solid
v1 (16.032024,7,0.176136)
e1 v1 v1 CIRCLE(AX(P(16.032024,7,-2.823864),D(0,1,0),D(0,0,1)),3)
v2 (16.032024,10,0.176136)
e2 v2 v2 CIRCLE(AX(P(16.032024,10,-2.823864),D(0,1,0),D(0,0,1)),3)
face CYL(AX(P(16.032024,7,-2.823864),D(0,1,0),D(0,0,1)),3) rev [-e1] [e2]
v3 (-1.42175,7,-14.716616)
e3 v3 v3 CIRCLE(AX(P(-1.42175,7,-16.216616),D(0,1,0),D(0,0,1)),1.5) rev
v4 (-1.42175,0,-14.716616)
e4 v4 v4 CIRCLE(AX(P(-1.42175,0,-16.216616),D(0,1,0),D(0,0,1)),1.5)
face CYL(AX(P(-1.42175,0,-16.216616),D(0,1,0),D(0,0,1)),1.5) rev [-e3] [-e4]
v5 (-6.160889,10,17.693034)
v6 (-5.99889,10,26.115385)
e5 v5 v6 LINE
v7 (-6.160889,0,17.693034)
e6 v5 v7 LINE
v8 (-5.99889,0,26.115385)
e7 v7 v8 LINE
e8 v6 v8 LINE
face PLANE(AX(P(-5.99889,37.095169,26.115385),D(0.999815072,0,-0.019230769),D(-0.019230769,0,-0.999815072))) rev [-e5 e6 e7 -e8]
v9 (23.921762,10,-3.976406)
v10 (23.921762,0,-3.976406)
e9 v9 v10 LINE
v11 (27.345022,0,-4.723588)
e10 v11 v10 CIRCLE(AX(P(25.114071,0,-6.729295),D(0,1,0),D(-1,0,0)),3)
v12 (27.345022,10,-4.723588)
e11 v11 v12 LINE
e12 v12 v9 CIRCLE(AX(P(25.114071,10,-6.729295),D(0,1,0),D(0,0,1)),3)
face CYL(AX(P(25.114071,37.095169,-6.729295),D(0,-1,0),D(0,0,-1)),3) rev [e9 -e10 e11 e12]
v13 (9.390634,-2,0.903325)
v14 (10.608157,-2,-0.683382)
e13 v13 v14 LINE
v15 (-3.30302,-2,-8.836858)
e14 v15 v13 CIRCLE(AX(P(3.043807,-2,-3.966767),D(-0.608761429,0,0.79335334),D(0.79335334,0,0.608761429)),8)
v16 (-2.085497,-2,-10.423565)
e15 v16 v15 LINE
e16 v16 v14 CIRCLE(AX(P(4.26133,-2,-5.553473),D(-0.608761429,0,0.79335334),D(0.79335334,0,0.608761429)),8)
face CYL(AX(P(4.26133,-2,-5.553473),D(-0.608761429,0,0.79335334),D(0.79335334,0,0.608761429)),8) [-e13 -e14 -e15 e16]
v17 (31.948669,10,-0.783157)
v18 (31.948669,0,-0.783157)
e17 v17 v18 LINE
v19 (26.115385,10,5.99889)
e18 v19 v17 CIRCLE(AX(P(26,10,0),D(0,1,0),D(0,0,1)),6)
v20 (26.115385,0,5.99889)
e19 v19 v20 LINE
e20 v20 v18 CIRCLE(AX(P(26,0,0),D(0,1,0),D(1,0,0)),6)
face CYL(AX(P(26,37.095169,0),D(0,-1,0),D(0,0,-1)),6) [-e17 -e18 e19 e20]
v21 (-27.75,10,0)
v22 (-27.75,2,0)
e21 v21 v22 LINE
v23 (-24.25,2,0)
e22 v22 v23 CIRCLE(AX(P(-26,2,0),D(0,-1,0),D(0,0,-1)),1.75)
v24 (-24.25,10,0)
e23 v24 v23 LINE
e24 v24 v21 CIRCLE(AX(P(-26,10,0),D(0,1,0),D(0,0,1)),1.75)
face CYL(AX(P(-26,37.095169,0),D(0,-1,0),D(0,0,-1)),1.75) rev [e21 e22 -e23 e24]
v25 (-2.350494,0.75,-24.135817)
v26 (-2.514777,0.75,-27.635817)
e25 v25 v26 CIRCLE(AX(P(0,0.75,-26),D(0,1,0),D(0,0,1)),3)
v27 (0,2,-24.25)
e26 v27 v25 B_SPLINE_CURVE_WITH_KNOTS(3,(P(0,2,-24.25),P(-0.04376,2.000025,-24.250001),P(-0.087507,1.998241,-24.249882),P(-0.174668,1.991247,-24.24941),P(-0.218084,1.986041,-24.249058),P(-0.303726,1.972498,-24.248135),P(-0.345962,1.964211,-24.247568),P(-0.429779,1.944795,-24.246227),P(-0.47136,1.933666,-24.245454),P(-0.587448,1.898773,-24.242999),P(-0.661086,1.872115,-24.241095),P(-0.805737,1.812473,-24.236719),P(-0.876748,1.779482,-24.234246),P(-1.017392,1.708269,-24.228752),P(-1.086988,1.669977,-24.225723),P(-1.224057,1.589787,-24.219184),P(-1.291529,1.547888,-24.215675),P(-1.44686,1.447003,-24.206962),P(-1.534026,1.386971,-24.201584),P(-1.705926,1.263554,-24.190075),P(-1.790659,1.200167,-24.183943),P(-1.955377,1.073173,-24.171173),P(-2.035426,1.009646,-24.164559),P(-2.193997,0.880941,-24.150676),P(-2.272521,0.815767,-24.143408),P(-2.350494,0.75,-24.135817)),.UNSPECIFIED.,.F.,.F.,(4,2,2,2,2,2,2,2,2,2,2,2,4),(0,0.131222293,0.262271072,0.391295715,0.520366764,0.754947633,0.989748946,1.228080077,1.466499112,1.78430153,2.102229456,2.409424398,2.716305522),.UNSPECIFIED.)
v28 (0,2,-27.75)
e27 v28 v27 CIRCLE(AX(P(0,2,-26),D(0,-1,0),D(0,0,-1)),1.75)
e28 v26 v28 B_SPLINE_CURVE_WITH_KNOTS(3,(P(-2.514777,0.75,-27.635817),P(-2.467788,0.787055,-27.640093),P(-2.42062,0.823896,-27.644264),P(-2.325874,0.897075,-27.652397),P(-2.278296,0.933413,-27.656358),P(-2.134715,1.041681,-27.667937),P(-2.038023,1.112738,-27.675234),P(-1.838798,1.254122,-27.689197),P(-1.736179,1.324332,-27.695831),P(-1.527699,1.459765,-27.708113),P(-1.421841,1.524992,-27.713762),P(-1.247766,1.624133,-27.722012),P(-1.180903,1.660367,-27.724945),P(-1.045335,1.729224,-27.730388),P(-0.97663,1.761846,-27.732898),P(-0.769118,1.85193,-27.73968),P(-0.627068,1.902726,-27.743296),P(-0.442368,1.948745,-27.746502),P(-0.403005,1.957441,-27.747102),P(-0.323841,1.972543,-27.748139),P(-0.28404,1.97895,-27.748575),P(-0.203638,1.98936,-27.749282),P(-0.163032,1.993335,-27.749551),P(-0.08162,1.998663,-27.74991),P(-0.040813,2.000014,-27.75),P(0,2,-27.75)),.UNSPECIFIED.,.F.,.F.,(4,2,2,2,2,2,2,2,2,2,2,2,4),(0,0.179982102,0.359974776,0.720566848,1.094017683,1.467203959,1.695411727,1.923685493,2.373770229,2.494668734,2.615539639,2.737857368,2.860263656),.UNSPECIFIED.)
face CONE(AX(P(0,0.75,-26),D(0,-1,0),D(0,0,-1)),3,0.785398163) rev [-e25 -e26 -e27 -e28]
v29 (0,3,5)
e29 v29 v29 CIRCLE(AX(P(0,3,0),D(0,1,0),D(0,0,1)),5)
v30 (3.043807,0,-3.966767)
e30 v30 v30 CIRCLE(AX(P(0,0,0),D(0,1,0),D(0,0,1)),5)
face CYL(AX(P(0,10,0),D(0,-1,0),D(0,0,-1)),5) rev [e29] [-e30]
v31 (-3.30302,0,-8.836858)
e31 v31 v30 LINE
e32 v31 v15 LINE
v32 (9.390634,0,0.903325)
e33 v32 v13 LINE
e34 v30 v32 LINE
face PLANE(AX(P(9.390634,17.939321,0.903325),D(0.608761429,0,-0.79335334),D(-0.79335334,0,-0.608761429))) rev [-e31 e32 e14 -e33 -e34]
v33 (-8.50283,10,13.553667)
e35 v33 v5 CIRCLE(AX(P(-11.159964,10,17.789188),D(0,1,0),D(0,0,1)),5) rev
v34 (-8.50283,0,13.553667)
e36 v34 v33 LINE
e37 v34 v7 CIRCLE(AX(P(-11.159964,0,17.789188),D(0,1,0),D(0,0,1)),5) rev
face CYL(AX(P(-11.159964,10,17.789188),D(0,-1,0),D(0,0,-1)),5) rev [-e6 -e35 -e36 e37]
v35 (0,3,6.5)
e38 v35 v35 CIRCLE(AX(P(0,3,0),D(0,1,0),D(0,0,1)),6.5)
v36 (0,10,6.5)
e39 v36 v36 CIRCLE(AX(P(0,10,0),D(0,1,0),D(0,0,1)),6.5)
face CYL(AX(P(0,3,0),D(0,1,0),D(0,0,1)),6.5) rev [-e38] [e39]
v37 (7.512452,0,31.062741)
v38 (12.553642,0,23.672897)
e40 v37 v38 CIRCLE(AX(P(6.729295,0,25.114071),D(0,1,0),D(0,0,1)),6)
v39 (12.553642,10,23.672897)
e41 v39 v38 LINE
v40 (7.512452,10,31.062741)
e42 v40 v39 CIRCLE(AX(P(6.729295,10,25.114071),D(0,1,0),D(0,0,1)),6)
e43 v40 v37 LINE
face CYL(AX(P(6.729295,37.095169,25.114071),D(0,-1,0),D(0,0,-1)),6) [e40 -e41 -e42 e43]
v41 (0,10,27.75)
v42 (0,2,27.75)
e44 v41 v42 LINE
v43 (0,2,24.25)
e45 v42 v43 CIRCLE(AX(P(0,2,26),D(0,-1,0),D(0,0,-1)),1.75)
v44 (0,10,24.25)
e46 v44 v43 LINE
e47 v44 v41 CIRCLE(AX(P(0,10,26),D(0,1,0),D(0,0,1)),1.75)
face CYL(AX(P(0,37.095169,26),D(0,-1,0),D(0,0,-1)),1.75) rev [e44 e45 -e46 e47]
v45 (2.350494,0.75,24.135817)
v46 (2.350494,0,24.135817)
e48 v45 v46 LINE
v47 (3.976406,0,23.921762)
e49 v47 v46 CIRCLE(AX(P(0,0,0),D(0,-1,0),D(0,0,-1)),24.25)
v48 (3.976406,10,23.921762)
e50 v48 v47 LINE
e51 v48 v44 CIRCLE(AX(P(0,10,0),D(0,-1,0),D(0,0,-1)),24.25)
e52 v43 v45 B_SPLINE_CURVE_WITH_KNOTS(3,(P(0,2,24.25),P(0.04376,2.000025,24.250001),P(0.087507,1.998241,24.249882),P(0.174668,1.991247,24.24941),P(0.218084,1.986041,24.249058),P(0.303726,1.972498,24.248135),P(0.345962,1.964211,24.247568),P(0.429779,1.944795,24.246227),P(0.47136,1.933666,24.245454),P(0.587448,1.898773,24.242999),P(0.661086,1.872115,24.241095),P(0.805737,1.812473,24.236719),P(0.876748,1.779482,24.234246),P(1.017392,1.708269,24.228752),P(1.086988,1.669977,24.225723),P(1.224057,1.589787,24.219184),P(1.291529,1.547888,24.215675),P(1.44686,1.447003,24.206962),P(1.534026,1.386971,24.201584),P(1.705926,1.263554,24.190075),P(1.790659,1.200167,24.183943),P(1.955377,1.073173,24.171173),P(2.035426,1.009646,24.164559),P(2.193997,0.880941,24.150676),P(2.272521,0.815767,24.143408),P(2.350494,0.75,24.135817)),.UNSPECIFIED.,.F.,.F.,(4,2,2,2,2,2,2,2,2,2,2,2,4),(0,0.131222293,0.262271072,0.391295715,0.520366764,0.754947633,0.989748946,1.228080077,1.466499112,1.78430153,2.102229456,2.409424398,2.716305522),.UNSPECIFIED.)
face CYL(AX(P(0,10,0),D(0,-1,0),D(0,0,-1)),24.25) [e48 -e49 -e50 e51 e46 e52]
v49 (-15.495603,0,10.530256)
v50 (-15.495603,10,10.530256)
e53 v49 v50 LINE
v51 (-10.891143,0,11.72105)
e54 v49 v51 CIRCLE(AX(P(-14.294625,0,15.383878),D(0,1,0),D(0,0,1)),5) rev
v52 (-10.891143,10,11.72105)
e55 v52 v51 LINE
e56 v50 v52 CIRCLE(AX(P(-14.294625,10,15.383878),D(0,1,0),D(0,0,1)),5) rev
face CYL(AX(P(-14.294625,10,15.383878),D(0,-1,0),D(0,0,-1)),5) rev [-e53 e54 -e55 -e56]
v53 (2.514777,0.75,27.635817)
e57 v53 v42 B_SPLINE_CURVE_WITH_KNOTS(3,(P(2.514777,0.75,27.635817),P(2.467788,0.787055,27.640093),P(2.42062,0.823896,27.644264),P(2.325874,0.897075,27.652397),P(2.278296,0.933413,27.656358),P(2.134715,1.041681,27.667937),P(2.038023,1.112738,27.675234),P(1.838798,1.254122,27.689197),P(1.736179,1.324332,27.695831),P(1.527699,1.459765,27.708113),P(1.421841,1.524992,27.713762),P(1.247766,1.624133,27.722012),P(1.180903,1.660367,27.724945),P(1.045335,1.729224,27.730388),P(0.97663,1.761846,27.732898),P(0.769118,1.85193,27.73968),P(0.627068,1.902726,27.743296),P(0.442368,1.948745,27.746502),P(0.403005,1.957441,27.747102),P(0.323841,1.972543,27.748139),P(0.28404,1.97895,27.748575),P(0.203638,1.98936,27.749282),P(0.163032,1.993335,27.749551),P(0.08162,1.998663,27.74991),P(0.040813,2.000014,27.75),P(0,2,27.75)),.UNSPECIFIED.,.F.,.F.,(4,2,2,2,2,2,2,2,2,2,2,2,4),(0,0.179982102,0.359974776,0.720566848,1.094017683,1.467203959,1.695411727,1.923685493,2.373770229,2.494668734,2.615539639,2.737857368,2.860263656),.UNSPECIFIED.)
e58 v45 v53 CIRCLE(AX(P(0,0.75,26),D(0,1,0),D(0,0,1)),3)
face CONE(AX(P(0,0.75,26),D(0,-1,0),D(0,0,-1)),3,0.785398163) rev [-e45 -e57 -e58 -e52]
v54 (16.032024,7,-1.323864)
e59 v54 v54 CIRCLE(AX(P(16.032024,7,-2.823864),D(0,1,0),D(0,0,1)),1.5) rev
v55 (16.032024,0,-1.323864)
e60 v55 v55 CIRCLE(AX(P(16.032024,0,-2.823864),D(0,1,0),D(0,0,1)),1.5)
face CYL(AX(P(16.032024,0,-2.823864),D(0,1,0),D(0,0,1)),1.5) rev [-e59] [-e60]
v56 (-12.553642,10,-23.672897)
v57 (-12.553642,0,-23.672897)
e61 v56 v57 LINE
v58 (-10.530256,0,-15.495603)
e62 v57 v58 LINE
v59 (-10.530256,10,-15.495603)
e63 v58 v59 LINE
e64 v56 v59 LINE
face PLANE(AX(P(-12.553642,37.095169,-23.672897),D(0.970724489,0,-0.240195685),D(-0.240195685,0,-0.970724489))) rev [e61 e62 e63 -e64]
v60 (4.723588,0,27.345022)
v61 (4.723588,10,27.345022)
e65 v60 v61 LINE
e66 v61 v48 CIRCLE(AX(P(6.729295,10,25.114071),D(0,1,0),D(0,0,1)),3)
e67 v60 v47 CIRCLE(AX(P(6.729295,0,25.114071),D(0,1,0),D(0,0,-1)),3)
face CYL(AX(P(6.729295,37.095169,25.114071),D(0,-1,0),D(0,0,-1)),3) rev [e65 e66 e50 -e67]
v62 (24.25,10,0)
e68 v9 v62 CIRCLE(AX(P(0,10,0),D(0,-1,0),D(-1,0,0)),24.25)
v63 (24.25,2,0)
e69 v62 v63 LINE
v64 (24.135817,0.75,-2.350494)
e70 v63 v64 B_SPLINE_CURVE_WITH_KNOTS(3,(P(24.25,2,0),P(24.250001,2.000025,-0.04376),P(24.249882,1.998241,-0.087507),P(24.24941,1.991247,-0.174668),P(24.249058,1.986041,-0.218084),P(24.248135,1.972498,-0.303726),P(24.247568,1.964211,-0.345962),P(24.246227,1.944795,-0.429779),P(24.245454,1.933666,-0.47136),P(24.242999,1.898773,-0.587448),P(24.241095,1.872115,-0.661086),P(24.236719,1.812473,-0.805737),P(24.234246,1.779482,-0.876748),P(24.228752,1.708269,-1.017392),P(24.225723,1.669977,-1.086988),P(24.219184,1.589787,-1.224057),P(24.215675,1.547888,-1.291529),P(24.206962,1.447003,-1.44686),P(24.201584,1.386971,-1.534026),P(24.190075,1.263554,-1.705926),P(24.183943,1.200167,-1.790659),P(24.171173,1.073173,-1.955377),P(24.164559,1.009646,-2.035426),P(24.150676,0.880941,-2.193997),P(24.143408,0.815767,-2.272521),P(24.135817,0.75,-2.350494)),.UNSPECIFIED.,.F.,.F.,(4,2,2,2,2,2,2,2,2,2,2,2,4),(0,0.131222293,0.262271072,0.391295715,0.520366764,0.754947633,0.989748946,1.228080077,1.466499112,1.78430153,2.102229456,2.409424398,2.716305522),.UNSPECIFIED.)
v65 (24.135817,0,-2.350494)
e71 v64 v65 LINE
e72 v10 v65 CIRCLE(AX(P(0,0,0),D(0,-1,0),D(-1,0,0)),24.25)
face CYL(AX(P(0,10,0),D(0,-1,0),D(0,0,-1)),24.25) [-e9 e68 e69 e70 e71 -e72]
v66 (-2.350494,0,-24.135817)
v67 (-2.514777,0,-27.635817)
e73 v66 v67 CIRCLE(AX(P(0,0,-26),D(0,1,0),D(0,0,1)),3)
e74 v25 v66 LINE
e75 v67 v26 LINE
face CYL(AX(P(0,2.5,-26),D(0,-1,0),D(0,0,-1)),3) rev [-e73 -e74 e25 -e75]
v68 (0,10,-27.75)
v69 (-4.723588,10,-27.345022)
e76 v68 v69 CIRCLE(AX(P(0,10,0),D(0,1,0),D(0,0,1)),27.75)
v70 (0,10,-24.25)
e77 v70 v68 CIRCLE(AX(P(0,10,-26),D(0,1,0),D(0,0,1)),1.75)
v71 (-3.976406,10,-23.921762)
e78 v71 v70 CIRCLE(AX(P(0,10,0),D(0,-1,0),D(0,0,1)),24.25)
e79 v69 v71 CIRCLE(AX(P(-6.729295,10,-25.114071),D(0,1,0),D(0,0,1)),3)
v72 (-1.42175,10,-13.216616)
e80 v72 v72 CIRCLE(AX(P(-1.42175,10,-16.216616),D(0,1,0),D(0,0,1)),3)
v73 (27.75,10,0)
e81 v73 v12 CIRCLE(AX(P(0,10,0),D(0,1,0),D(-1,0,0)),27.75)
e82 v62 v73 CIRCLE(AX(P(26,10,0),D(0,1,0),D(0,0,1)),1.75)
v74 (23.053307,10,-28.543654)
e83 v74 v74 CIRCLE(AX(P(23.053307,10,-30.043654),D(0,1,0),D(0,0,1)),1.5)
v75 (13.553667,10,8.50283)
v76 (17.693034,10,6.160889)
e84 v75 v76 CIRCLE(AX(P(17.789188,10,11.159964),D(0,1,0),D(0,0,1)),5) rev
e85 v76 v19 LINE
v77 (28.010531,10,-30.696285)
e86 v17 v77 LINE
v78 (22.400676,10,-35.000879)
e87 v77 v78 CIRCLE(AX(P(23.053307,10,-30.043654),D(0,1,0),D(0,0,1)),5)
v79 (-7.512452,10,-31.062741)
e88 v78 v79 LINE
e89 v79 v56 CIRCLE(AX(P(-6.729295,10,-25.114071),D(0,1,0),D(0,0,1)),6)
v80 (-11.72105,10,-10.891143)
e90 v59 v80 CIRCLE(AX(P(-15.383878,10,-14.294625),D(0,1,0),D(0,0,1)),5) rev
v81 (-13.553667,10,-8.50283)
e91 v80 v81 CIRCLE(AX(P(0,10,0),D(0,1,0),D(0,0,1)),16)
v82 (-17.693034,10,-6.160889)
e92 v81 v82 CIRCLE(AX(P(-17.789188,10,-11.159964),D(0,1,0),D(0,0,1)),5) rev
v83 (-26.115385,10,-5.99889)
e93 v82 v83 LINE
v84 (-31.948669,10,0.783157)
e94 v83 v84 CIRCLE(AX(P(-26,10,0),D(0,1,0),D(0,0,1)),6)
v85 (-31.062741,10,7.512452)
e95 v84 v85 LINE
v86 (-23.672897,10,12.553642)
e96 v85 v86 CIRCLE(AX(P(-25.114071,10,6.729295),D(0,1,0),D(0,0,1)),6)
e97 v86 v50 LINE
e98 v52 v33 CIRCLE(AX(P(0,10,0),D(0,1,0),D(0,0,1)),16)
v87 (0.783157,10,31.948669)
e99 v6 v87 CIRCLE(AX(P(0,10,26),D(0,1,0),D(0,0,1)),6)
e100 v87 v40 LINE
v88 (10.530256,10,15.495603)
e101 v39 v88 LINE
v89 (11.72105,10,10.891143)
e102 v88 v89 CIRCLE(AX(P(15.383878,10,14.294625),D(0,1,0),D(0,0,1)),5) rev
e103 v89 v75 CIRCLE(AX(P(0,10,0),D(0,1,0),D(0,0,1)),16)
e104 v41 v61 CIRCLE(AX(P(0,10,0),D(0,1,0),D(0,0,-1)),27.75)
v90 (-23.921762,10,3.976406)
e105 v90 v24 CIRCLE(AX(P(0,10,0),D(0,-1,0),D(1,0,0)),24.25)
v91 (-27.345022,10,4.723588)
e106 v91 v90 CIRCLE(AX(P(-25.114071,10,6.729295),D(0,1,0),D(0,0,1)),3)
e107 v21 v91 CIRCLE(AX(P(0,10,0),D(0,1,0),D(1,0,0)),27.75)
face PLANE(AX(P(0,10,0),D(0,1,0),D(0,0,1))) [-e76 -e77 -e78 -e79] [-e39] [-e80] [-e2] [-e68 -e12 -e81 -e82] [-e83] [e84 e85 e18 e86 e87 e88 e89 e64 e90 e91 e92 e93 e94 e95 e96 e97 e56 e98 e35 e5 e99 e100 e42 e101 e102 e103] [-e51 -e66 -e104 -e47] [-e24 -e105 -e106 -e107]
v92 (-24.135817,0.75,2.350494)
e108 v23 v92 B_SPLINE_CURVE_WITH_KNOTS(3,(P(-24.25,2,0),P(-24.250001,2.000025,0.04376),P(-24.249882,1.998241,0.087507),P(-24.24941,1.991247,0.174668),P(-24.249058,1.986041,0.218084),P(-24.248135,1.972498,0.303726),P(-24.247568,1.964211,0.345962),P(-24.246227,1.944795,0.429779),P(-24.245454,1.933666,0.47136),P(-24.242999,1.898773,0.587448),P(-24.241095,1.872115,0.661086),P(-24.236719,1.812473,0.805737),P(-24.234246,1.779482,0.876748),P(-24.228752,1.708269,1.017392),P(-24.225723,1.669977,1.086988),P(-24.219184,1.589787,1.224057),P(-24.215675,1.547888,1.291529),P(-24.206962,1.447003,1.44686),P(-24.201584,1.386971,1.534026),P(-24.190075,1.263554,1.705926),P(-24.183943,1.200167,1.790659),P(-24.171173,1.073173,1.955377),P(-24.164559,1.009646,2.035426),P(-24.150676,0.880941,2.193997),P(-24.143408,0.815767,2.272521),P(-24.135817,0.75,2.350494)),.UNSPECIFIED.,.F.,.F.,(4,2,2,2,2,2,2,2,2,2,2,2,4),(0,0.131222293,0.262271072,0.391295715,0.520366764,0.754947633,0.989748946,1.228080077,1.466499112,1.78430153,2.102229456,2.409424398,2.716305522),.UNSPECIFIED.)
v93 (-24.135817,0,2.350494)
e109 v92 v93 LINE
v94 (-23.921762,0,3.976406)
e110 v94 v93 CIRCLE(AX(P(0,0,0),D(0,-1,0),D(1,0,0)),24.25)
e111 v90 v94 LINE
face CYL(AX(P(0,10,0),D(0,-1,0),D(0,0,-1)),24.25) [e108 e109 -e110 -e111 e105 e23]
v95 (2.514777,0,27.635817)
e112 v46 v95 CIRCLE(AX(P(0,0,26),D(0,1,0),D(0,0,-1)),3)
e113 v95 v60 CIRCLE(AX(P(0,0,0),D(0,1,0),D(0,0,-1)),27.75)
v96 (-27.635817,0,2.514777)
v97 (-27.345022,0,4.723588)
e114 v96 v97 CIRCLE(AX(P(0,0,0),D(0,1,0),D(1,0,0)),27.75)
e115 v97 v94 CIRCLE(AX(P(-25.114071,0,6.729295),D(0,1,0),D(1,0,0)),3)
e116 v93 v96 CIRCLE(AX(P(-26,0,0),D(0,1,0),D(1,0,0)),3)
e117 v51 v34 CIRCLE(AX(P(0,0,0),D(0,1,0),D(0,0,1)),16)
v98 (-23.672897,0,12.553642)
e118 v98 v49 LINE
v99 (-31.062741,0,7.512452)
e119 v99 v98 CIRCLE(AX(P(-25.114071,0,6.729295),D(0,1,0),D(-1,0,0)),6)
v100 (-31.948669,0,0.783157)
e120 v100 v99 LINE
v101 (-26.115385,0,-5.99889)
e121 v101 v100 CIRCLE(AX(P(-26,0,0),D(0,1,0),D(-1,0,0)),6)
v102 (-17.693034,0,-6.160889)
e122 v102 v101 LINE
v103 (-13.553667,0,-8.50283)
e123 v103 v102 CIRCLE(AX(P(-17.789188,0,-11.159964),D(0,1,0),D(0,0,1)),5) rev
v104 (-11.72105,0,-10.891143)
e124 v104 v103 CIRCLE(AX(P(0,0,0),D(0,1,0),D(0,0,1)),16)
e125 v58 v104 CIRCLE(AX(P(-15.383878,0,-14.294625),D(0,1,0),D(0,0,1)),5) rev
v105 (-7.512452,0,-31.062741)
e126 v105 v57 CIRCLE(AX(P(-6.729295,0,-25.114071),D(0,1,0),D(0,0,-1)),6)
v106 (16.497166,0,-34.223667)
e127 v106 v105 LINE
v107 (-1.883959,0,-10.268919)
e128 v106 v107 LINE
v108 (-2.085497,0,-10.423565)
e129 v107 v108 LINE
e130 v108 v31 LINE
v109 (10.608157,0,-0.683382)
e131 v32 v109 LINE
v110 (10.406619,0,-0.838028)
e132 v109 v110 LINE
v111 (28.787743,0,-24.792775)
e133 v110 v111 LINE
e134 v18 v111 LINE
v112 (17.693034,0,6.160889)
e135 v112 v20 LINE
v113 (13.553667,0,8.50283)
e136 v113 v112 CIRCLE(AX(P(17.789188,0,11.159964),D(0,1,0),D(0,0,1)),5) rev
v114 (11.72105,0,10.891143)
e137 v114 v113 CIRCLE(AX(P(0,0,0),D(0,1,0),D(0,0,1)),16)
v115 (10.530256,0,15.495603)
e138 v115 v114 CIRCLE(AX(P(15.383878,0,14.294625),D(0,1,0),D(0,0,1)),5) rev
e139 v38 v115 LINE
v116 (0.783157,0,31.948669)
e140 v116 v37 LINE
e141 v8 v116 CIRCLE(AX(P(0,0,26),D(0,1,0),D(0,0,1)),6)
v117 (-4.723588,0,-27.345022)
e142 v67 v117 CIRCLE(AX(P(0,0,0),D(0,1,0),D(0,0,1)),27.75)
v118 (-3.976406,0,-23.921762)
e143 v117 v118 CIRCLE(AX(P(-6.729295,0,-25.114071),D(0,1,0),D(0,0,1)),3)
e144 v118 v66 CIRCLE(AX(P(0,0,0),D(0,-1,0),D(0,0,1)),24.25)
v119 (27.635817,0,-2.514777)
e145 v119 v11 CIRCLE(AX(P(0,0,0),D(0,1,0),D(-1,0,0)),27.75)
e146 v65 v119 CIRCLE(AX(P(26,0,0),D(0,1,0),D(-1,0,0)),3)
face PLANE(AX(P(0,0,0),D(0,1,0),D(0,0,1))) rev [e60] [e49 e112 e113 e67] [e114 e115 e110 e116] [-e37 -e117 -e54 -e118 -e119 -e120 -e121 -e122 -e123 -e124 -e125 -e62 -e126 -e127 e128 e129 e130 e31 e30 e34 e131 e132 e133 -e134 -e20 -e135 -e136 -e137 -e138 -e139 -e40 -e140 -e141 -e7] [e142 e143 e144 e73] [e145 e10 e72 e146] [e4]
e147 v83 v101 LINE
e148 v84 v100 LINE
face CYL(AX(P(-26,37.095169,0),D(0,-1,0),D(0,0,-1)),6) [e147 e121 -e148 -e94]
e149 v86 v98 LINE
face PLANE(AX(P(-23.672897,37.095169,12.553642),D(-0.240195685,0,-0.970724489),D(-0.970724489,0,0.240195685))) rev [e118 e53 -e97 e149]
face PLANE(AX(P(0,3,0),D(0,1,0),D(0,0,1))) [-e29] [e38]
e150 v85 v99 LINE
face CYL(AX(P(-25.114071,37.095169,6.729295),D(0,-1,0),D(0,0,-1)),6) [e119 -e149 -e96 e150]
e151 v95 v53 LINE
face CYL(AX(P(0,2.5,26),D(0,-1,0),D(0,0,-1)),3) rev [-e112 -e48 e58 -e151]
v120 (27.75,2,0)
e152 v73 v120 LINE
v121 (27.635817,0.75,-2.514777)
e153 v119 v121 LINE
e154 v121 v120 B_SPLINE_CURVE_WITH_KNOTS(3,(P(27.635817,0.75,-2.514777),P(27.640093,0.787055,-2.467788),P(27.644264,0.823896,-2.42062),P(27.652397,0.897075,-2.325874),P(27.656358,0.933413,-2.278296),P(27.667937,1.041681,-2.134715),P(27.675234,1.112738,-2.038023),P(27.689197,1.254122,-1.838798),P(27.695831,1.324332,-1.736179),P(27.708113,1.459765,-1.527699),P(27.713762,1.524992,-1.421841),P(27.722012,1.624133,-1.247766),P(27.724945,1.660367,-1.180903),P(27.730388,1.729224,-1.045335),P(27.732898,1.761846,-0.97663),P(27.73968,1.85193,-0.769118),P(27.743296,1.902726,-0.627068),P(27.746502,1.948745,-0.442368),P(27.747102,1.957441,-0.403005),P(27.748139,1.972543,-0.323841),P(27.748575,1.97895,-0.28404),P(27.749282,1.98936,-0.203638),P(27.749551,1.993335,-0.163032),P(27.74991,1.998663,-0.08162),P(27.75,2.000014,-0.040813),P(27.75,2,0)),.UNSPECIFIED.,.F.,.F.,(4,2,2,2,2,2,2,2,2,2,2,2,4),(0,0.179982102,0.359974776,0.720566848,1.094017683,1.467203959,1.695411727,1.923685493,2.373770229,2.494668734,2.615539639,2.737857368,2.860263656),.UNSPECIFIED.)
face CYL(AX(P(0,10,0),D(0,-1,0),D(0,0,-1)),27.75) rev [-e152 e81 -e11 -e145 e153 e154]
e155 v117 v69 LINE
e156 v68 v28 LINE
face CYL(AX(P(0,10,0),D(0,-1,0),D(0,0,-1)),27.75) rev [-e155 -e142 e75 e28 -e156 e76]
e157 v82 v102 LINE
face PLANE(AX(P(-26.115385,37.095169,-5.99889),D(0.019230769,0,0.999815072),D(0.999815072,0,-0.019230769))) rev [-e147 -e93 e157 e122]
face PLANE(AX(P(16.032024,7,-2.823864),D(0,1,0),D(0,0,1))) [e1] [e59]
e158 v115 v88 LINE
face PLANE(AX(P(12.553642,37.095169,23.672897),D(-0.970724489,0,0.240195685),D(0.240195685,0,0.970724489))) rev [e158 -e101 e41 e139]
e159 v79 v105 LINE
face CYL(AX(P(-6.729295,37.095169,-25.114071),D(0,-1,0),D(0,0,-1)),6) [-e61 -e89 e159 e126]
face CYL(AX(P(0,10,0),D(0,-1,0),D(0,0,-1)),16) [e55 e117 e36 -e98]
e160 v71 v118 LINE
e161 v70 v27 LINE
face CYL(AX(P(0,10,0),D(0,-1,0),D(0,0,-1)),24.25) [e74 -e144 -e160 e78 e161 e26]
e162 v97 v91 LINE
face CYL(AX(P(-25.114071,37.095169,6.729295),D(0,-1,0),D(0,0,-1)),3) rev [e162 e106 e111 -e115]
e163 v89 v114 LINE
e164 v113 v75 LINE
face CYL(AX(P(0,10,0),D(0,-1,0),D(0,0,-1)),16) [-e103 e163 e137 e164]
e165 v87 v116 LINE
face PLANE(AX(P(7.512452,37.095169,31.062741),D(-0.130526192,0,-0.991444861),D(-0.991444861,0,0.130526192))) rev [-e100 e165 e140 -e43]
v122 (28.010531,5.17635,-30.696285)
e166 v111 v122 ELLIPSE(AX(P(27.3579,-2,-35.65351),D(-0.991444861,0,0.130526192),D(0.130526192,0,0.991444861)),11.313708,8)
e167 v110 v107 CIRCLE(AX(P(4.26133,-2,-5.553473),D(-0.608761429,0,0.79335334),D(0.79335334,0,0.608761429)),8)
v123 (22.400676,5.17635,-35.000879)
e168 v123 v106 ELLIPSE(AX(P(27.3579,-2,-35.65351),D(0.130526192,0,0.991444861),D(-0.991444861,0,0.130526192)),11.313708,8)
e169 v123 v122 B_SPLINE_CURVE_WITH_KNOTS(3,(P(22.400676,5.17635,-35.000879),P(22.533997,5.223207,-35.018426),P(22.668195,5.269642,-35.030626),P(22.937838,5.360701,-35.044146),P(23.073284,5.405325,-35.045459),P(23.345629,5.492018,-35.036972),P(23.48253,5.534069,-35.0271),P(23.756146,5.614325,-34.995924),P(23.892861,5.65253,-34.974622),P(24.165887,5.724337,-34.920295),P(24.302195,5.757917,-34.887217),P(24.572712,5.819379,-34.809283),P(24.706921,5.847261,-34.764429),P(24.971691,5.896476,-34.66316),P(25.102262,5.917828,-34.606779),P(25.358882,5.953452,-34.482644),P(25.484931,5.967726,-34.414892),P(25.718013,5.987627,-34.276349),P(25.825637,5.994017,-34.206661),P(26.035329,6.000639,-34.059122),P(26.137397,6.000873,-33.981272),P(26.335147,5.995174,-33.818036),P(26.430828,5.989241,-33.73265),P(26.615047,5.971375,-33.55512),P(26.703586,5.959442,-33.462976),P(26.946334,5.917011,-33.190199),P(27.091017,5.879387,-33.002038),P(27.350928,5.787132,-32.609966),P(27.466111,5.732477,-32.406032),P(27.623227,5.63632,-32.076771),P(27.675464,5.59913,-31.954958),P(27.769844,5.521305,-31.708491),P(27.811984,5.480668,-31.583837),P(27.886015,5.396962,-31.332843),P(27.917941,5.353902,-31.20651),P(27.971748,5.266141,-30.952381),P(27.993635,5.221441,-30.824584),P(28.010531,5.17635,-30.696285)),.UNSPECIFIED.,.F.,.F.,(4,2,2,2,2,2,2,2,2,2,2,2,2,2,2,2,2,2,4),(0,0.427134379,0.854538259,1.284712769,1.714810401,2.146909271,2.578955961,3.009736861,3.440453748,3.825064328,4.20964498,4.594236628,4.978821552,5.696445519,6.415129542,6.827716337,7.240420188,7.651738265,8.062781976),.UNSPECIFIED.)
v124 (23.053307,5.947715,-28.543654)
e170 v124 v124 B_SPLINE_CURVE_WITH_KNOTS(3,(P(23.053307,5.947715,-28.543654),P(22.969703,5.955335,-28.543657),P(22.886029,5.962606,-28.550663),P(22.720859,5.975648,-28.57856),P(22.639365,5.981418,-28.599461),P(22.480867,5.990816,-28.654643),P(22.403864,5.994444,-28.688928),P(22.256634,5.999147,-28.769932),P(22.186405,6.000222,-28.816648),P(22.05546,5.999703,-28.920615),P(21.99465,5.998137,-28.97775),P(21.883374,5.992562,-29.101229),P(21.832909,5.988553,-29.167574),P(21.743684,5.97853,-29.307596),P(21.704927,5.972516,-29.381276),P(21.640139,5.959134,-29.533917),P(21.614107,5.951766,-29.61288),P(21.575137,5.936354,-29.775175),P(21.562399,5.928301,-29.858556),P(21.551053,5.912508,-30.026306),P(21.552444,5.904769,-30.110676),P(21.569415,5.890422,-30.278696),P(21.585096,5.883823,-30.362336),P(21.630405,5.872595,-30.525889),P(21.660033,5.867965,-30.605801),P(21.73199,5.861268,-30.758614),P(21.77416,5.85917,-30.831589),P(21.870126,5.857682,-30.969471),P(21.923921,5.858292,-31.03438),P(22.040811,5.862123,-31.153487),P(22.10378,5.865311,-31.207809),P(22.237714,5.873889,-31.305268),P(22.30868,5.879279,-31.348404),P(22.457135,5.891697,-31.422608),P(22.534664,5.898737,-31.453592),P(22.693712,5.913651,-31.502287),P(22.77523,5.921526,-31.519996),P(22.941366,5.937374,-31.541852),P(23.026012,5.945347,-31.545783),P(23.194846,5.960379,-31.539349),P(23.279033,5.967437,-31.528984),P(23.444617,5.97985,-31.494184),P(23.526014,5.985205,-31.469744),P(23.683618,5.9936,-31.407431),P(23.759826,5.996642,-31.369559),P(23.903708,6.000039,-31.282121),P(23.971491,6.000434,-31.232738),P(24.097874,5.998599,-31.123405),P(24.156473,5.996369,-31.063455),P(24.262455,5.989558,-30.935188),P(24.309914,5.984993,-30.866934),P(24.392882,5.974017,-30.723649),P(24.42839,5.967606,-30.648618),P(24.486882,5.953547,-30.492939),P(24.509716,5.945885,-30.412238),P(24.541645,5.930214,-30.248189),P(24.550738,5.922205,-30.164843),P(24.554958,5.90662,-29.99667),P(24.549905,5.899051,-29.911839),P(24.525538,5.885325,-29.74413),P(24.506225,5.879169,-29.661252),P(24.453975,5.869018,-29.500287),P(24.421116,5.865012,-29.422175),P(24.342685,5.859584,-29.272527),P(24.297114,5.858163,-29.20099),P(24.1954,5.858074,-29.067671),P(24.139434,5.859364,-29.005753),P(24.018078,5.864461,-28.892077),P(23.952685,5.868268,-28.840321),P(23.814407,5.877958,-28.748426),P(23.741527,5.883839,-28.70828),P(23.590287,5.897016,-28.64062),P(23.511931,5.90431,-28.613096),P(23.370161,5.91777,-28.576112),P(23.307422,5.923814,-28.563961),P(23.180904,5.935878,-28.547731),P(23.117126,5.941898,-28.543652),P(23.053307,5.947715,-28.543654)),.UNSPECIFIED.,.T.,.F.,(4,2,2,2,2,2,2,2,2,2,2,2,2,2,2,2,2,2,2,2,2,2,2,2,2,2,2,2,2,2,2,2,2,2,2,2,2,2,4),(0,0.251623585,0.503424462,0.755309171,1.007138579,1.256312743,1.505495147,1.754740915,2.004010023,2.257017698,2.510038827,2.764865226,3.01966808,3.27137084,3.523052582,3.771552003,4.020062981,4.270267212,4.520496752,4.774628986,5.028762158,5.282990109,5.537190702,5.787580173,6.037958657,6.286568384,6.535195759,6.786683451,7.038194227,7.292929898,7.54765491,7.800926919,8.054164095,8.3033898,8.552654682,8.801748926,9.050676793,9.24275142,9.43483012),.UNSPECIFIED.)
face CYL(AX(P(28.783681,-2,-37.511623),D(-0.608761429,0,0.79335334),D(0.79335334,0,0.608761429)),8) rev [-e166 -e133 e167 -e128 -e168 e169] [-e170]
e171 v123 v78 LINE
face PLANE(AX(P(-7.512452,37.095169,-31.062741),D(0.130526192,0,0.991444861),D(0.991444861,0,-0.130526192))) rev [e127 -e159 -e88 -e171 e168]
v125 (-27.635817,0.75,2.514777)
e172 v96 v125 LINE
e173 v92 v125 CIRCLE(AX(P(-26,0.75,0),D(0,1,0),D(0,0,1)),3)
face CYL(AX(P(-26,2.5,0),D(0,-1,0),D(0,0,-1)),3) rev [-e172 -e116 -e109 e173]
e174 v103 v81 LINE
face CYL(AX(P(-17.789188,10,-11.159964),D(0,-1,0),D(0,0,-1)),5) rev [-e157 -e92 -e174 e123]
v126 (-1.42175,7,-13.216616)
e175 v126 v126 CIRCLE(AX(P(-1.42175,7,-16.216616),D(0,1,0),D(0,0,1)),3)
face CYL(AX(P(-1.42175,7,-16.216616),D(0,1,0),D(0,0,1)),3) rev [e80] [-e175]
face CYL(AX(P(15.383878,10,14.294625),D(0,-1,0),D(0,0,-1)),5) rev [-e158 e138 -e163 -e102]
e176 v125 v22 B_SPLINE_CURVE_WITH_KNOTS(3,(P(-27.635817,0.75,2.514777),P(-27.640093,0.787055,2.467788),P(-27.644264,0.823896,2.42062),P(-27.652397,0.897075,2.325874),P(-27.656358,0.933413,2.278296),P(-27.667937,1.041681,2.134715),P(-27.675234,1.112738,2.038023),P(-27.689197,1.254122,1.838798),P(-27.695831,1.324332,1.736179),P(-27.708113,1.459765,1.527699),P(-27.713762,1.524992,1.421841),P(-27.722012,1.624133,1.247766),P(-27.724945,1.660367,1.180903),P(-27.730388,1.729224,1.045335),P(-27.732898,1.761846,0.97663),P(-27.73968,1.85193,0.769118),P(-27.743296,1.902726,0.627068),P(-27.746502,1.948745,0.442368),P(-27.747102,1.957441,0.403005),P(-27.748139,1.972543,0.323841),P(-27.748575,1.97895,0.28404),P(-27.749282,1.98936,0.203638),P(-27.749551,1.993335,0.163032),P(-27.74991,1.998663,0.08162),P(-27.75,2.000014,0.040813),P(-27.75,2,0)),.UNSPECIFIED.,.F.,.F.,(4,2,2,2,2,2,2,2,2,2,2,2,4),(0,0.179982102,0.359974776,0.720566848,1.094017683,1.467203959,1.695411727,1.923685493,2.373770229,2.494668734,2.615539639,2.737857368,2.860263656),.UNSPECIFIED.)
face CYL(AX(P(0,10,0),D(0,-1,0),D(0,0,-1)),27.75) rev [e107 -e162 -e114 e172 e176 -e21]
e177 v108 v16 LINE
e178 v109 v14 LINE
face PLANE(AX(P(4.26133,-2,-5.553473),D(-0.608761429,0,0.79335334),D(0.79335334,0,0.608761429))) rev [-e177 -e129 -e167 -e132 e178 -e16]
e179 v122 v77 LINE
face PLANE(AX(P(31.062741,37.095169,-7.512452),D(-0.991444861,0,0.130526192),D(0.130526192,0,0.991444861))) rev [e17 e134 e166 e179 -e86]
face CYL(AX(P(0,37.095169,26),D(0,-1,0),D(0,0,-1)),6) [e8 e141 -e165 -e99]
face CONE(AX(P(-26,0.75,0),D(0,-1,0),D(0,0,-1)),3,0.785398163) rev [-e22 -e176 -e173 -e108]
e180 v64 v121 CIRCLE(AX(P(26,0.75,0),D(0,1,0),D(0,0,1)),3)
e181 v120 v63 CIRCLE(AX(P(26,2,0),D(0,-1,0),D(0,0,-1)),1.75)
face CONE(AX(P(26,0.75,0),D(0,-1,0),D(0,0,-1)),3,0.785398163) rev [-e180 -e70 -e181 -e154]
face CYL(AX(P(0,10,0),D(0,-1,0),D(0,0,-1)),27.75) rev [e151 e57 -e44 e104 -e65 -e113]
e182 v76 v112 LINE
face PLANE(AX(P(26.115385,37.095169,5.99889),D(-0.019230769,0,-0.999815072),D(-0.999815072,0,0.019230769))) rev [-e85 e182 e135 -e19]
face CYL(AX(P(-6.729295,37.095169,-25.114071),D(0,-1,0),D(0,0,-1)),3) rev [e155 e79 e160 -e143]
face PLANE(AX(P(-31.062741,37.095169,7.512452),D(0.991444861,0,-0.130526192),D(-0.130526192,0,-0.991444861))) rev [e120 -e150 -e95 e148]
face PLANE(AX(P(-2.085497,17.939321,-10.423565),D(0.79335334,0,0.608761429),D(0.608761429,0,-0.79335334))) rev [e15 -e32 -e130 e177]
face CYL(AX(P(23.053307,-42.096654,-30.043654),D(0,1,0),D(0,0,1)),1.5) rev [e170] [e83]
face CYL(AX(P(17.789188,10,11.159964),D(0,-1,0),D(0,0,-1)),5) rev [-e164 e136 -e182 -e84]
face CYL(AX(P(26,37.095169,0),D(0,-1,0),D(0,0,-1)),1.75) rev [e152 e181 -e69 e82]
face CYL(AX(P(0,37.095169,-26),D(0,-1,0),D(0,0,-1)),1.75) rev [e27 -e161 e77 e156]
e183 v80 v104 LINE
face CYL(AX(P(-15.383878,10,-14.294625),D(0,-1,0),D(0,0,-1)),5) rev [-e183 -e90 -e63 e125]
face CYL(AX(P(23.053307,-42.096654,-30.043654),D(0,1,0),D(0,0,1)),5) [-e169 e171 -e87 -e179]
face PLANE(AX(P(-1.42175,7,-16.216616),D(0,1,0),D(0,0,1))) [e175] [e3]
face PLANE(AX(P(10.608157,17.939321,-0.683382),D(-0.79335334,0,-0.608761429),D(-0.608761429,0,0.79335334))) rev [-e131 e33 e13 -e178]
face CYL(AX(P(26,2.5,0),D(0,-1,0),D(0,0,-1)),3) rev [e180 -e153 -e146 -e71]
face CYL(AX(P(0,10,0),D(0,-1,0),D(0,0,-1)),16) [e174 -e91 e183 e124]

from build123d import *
from build123d.topology import SkipClean

# Parameters (mm, degrees)
SKETCH1_R                = 16
SKETCH1_R_2              = 5
BOSS_EXTRUDE1_DEPTH      = 10
SKETCH8_R                = 6.5
CUT_EXTRUDE7_DEPTH       = 7
SKETCH2_R                = 3
SKETCH2_R_2              = 1.75
BOSS_EXTRUDE2_DEPTH      = 10
CUT_EXTRUDE5_DEPTH       = 38.148351242
SKETCH6_R                = 3
CUT_EXTRUDE6_DEPTH       = 2.5
CHAMFER2_START           = 0.7499999
CHAMFER2_DEPTH           = 1.7500001
FILLET1_R                = 5
CIRPATTERN1_COUNT        = 4
FILLET1_OF_CIRPATTERN1_R = 5
SKETCH9_R                = 22
SKETCH9_R_2              = 10
CUT_EXTRUDE8_DEPTH       = 6
FILLET2_R                = 6
SKETCH11_R               = 1.5
CUT_EXTRUDE9_DEPTH       = 47.346520905
CUT_EXTRUDE10_DEPTH      = 6
BOSS_EXTRUDE8_DEPTH      = 19.627187
BOSS_EXTRUDE8_DEPTH_BACK = 7
SKETCH16_W               = 20
SKETCH16_H               = 10
SKETCH19_R               = 5
CUT_EXTRUDE12_DEPTH      = 47.346520905
SKETCH19_3_R             = 6.5
SKETCH19_3_R_2           = 5
CUT_EXTRUDE13_DEPTH      = 7
BOSS_EXTRUDE9_START      = -4
BOSS_EXTRUDE9_DEPTH      = 10
SKETCH21_R               = 1.5
CUT_EXTRUDE15_DEPTH      = 47.346520905
BOSS_EXTRUDE11_START     = -10
BOSS_EXTRUDE11_DEPTH     = 10
SKETCH25_R               = 8
CUT_EXTRUDE16_DEPTH      = 54.152115825
BOSS_EXTRUDE12_DEPTH     = 6
REVOLVE1_ANGLE           = 180
BOSS_EXTRUDE13_DEPTH     = 2
SKETCH30_R               = 3
CUT_EXTRUDE17_DEPTH      = 3


with BuildPart() as part:
    # Sketch1 → Boss-Extrude1 (new body)
    with BuildSketch(Plane(origin=(0, 0, 0), x_dir=(1, 0, 0), z_dir=(0, 1, 0))):
        with Locations(Location((0, 0, 0), (0, 0, 270))):
            Circle(SKETCH1_R)
        with Locations(Location((0, 0, 0), (0, 0, 270))):
            Circle(SKETCH1_R_2, mode=Mode.SUBTRACT)
    extrude(amount=BOSS_EXTRUDE1_DEPTH)

    # Sketch8 → Cut-Extrude7 (cut)
    with BuildSketch(Plane(origin=(0, 10, 0), x_dir=(1, 0, 0), z_dir=(0, 1, 0))):
        with Locations(Location((0, 0, 0), (0, 0, 270))):
            Circle(SKETCH8_R)
    extrude(amount=-CUT_EXTRUDE7_DEPTH, mode=Mode.SUBTRACT)

    # Sketch2 → Boss-Extrude2 (add)
    with BuildSketch(Plane(origin=(0, 0, 0), x_dir=(1, 0, 0), z_dir=(0, 1, 0))):
        with BuildLine():
            Line((-7.512452326, 31.062740652), (-0.783157153, 31.948669168))
            ThreePointArc((-0.783157153, 31.948669168), (3.91251461, 30.548871226), (5.99889043, 26.115384615))
            Line((5.99889043, 26.115384615), (6.217640437, 14.742487829))
            Line((6.217640437, 14.742487829), (-9.821416099, 12.630905978))
            Line((-9.821416099, 12.630905978), (-12.553642104, 23.672897371))
            ThreePointArc((-12.553642104, 23.672897371), (-11.685828587, 28.495310386), (-7.512452326, 31.062740652))
        make_face()
        with Locations(Location((-6.729295173, 25.114071484, 0), (0, 0, 270))):
            Circle(SKETCH2_R, mode=Mode.SUBTRACT)
        with Locations(Location((0, 26, 0), (0, 0, 270))):
            Circle(SKETCH2_R_2, mode=Mode.SUBTRACT)
    boss_extrude2 = extrude(amount=BOSS_EXTRUDE2_DEPTH)

    # Sketch5 → Cut-Extrude5 (cut, through all)
    with BuildSketch(Plane(origin=(0, 0, 0), x_dir=(1, 0, 0), z_dir=(0, 1, 0))):
        with BuildLine():
            ThreePointArc((0, 27.75), (-3.622101834, 27.512594903), (-7.182228502, 26.80444168))
            ThreePointArc((-7.182228502, 26.80444168), (-8.419665369, 24.661138155), (-6.276361844, 23.423701288))
            ThreePointArc((-6.276361844, 23.423701288), (-3.165260161, 24.042537888), (0, 24.25))
            ThreePointArc((0, 24.25), (1.75, 26), (0, 27.75))
        make_face()
    cut_extrude5 = extrude(amount=CUT_EXTRUDE5_DEPTH, mode=Mode.SUBTRACT)

    # Sketch6 → Cut-Extrude6 (cut)
    with BuildSketch(Plane(origin=(0, 0, 0), x_dir=(1, 0, 0), z_dir=(0, 1, 0))):
        with Locations((0, 26)):
            Circle(SKETCH6_R)
    cut_extrude6 = extrude(amount=CUT_EXTRUDE6_DEPTH, mode=Mode.SUBTRACT)

    # Chamfer2: read off the stored shape, not the designer's step
    # Chamfer2 outline → Chamfer2 (add)
    with SkipClean():  # the faces are left unmerged after this step: merging them gives an invalid solid
        with BuildSketch(Plane(origin=(0, 0, 0), x_dir=(1, 0, 0), z_dir=(0, 1, 0)).offset(CHAMFER2_START)):
            with BuildLine():
                ThreePointArc((0, 24.25), (-1.176632969, 24.221437506), (-2.35049418, 24.135817307))
                ThreePointArc((-2.35049418, 24.135817307), (2.996700707, 26.140658707), (-2.514776677, 27.635817308))
                ThreePointArc((-2.514776677, 27.635817308), (-1.258683779, 27.72143963), (0, 27.75))
                ThreePointArc((0, 27.75), (1.75, 26), (0, 24.25))
            make_face()
        chamfer2 = extrude(amount=CHAMFER2_DEPTH)
    add(part.part.scale(1), mode=Mode.REPLACE)  # the faces are merged on a copy

    # Chamfer2 2 outline → Chamfer2 2 (revolve, cut)
    with BuildSketch(Plane.XY.offset(-26)):
        Polygon((3, 0.75), (1.749995826, 2.000004174), (1.749995826, 0.7499999), align=None)
    chamfer2_2 = revolve(axis=Axis((0, 0, -26), (0, 1, 0)), mode=Mode.SUBTRACT)

    # Fillet1
    fillet1_edges = [part.edges().sort_by_distance(p)[0] for p in [
        (6.217640437, 5, -14.742487829),
        (-9.821416099, 5, -12.630905978),
    ]]
    fillet(fillet1_edges, radius=FILLET1_R)

    # CirPattern1: Boss-Extrude2, Cut-Extrude5, Cut-Extrude6, Chamfer2, Chamfer2 2 ×4 about axis
    with SkipClean():  # the faces are left unmerged after this step: merging them gives an invalid solid
        cirpattern1_axis = Axis((0, 0, 0), (0, 1, 0))
        add([boss_extrude2.rotate(cirpattern1_axis, i * 360 / CIRPATTERN1_COUNT) for i in range(1, CIRPATTERN1_COUNT)])
        add([cut_extrude5.rotate(cirpattern1_axis, i * 360 / CIRPATTERN1_COUNT) for i in range(1, CIRPATTERN1_COUNT)], mode=Mode.SUBTRACT)
        add([cut_extrude6.rotate(cirpattern1_axis, i * 360 / CIRPATTERN1_COUNT) for i in range(1, CIRPATTERN1_COUNT)], mode=Mode.SUBTRACT)
        add([chamfer2.rotate(cirpattern1_axis, i * 360 / CIRPATTERN1_COUNT) for i in range(1, CIRPATTERN1_COUNT)])
        add([chamfer2_2.rotate(cirpattern1_axis, i * 360 / CIRPATTERN1_COUNT) for i in range(1, CIRPATTERN1_COUNT)], mode=Mode.SUBTRACT)
    add(part.part.scale(1), mode=Mode.REPLACE)  # the faces are merged on a copy

    # Fillet1 of CirPattern1
    fillet1_of_cirpattern1_edges = [part.edges().sort_by_distance(p)[0] for p in [
        (-14.742487829, 5, -6.217640437),
        (-12.630905978, 5, 9.821416099),
        (-6.217640437, 5, 14.742487829),
        (9.821416099, 5, 12.630905978),
        (14.742487829, 5, 6.217640437),
        (12.630905978, 5, -9.821416099),
    ]]
    fillet(fillet1_of_cirpattern1_edges, radius=FILLET1_OF_CIRPATTERN1_R)

    # Sketch9 → Cut-Extrude8 (cut)
    with BuildSketch(Plane(origin=(0, 0, 0), x_dir=(1, 0, 0), z_dir=(0, 1, 0))):
        Circle(SKETCH9_R)
        with Locations(Location((0, 0, 0), (0, 0, 270))):
            Circle(SKETCH9_R_2, mode=Mode.SUBTRACT)
    extrude(amount=CUT_EXTRUDE8_DEPTH, mode=Mode.SUBTRACT)

    # Fillet2
    # the kernel refuses this fillet: 6 mm, written as the material it takes off along each edge
    with BuildSketch(Plane(origin=(-11.358105957, 6, -18.841269306), x_dir=(-0.24019568546626038, 0, -0.970724488556559), z_dir=(0, -1, 0)), Plane(origin=(-18.841269306, 6, 11.358105957), x_dir=(-0.970724488556559, 0, 0.24019568546626072), z_dir=(0, -1, 0)), Plane(origin=(18.841269306, 6, -11.358105957), x_dir=(0.9707244885565594, 0, -0.24019568546625922), z_dir=(0, -1, 0)), Plane(origin=(11.358105957, 6, 18.841269306), x_dir=(0.24019568546625802, 0, 0.9707244885565596), z_dir=(0, -1, 0))) as fillet2_piece_1:
        with BuildLine():
            CenterArc((6.969535845, 5.659608194), FILLET2_R, 178.280066573, 72.327761741)
            ThreePointArc((0.972238973, 5.839692152), (0.683445006, 2.886993735), (0, 0))
            Line((0, 0), (4.977342306, 0))
        make_face()
    extrude(amount=20.80018012, mode=Mode.SUBTRACT)
    with BuildSketch(Plane(origin=(6.094608551, 6, -21.138962761), x_dir=(-0.9893982849393695, 0, -0.1452275241097026), z_dir=(0, -1, 0)), Plane(origin=(-21.138962761, 6, -6.094608551), x_dir=(-0.14522752410970335, 0, 0.9893982849393694), z_dir=(0, -1, 0)), Plane(origin=(21.138962761, 6, 6.094608551), x_dir=(0.1452275241097043, 0, -0.9893982849393692), z_dir=(0, -1, 0)), Plane(origin=(-6.094608551, 6, 21.138962761), x_dir=(0.9893982849393691, 0, 0.14522752410970535), z_dir=(0, -1, 0))) as fillet2_piece_2:
        with BuildLine():
            CenterArc((6.7273546, 5.945443203), FILLET2_R, 189.939807021, 72.327761741)
            Line((0.81741677, 4.909762342), (0, 0))
            ThreePointArc((0, 0), (2.960036024, 0.200041589), (5.920072048, 0))
        make_face()
    extrude(amount=20.80018012, mode=Mode.SUBTRACT)

    # Sketch11 → Cut-Extrude9 (cut, through all)
    with BuildSketch(Plane(origin=(0, 10, 0), x_dir=(1, 0, 0), z_dir=(0, 1, 0))):
        with Locations(Location((-1.421749595, 16.216615803, 0), (0, 0, 270))):
            Circle(SKETCH11_R)
        with Locations(Location((16.032023891, 2.823864364, 0), (0, 0, 270))):
            Circle(SKETCH11_R)
    extrude(amount=-CUT_EXTRUDE9_DEPTH, mode=Mode.SUBTRACT)

    # Sketch12 → Cut-Extrude10 (cut)
    with BuildSketch(Plane.XZ):
        with BuildLine():
            Line((-1.404346095, -9.900899557), (9.927006101, -1.206047207))
            ThreePointArc((9.927006101, -1.206047207), (6.08761429, -7.933533403), (-1.404346095, -9.900899557))
        make_face()
    extrude(amount=-CUT_EXTRUDE10_DEPTH, mode=Mode.SUBTRACT)

    # Sketch16 → Boss-Extrude8 (add, two sides: drawn at the far end of the back side and taken through both)
    with BuildSketch(Plane(origin=(4.261330003, 0, -5.553473382), x_dir=(-0.7933533402912363, 0, -0.6087614290087193), z_dir=(0.6087614290087192, 0, -0.7933533402912362)).offset(-BOSS_EXTRUDE8_DEPTH_BACK)):
        with Locations((0, 5)):
            Rectangle(SKETCH16_W, SKETCH16_H)
    extrude(amount=BOSS_EXTRUDE8_DEPTH + BOSS_EXTRUDE8_DEPTH_BACK)

    # Sketch19 → Cut-Extrude12 (cut, through all)
    with SkipClean():  # the faces are left unmerged after this step: merging them gives an invalid solid
        with BuildSketch(Plane(origin=(0, 10, 0), x_dir=(1, 0, 0), z_dir=(0, 1, 0))):
            with Locations(Location((0, 0, 0), (0, 0, 142.5))):
                Circle(SKETCH19_R)
        extrude(amount=-CUT_EXTRUDE12_DEPTH, mode=Mode.SUBTRACT)

    # Sketch19<3> → Cut-Extrude13 (cut)
    with BuildSketch(Plane(origin=(0, 10, 0), x_dir=(1, 0, 0), z_dir=(0, 1, 0))):
        with Locations(Location((0, 0, 0), (0, 0, 270))):
            Circle(SKETCH19_3_R)
        with Locations(Location((0, 0, 0), (0, 0, 270))):
            Circle(SKETCH19_3_R_2, mode=Mode.SUBTRACT)
    extrude(amount=-CUT_EXTRUDE13_DEPTH, mode=Mode.SUBTRACT)

    # Sketch22 → Boss-Extrude9 (add)
    with BuildSketch(Plane.XZ.offset(-6).offset(BOSS_EXTRUDE9_START)):
        with BuildLine():
            Line((3.652568574, -30.760120042), (28.766640058, -11.489415214))
            ThreePointArc((28.766640058, -11.489415214), (26.34114568, -12.602479055), (23.672897371, -12.553642104))
            ThreePointArc((23.672897371, -12.553642104), (21.347832311, -9.643979794), (21.187714345, -5.922901386))
            ThreePointArc((21.187714345, -5.922901386), (21.81178695, -2.871576229), (21.998720167, 0.23729942))
            ThreePointArc((21.998720167, 0.23729942), (22.602900702, 2.926688653), (24.345802548, 5.062137486))
            Line((24.345802548, 5.062137486), (-11.190806701, -22.206061852))
            ThreePointArc((-11.190806701, -22.206061852), (-8.677025331, -21.075242775), (-5.922901386, -21.187714345))
            ThreePointArc((-5.922901386, -21.187714345), (-2.871576229, -21.81178695), (0.23729942, -21.998720167))
            ThreePointArc((0.23729942, -21.998720167), (3.790143578, -23.116468206), (5.99889043, -26.115384615))
            ThreePointArc((5.99889043, -26.115384615), (5.355469823, -28.705354501), (3.652568574, -30.760120042))
        make_face()
    extrude(amount=BOSS_EXTRUDE9_DEPTH)

    # Sketch21 → Cut-Extrude15 (cut, through all)
    with SkipClean():  # the faces are left unmerged after this step: merging them gives an invalid solid
        with BuildSketch(Plane(origin=(0, 10, 0), x_dir=(1, 0, 0), z_dir=(0, 1, 0))):
            with Locations(Location((-1.421749595, 16.216615803, 0), (0, 0, 270))):
                Circle(SKETCH21_R)
            with Locations(Location((16.032023891, 2.823864364, 0), (0, 0, 270))):
                Circle(SKETCH21_R)
        extrude(amount=-CUT_EXTRUDE15_DEPTH, mode=Mode.SUBTRACT)
    add(part.part.scale(1), mode=Mode.REPLACE)  # the faces are merged on a copy

    # Sketch24 → Boss-Extrude11 (add)
    with BuildSketch(Plane(origin=(0, 10, 0), x_dir=(1, 0, 0), z_dir=(0, 1, 0)).offset(BOSS_EXTRUDE11_START)):
        with BuildLine():
            ThreePointArc((28.010531131, 30.696285343), (27.383433844, 32.543654382), (26.09711397, 34.010421083))
            Line((26.09711397, 34.010421083), (23.966448968, 31.233684392))
            ThreePointArc((23.966448968, 31.233684392), (24.398615937, 30.707087417), (24.553306825, 30.043654382))
            ThreePointArc((24.553306825, 30.043654382), (23.71673986, 28.698345269), (22.140164681, 28.853624371))
            Line((22.140164681, 28.853624371), (16.209604316, 21.124767628))
            Line((16.209604316, 21.124767628), (28.766640058, 11.489415214))
            ThreePointArc((28.766640058, 11.489415214), (30.310223906, 9.729295173), (31.062740652, 7.512452326))
            Line((31.062740652, 7.512452326), (28.010531131, 30.696285343))
        make_face()
        with BuildLine():
            Line((22.400675863, 35.000878689), (-0.783157153, 31.948669168))
            ThreePointArc((-0.783157153, 31.948669168), (1.552914271, 31.795554958), (3.652568574, 30.760120042))
            Line((3.652568574, 30.760120042), (16.209604316, 21.124767628))
            Line((16.209604316, 21.124767628), (22.140164681, 28.853624371))
            ThreePointArc((22.140164681, 28.853624371), (21.863276814, 30.956796525), (23.966448968, 31.233684392))
            Line((23.966448968, 31.233684392), (26.09711397, 34.010421083))
            ThreePointArc((26.09711397, 34.010421083), (24.34740205, 34.873283513), (22.400675863, 35.000878689))
        make_face()
    extrude(amount=BOSS_EXTRUDE11_DEPTH)

    # Sketch25 → Cut-Extrude16 (cut, through all)
    with BuildSketch(Plane(origin=(4.261330003, 0, -5.553473382), x_dir=(0.7933533402912363, 0, 0.6087614290087192), z_dir=(-0.6087614290087192, 0, 0.7933533402912363))):
        with Locations((0, -2)):
            Circle(SKETCH25_R)
    extrude(amount=-CUT_EXTRUDE16_DEPTH, mode=Mode.SUBTRACT)

    # Sketch26 → Boss-Extrude12 (add)
    with BuildSketch(Plane.XZ.offset(-6)):
        with BuildLine():
            Line((7.933533403, 6.08761429), (14.511031326, -2.484347893))
            Line((14.511031326, -2.484347893), (14.585398957, -2.427283602))
            ThreePointArc((14.585398957, -2.427283602), (15.118881748, -1.633834354), (16.023370375, -1.323889326))
            Line((16.023370375, -1.323889326), (24.345802548, 5.062137486))
            ThreePointArc((24.345802548, 5.062137486), (25.191242868, 5.604849798), (26.115384615, 5.99889043))
            Line((26.115384615, 5.99889043), (17.693033963, 6.16088867))
            ThreePointArc((17.693033963, 6.16088867), (15.327070116, 6.808185487), (13.553666902, 8.502829736))
            ThreePointArc((13.553666902, 8.502829736), (12.693653445, 9.740182864), (11.721049963, 10.891142629))
            ThreePointArc((11.721049963, 10.891142629), (10.543139844, 13.0427248), (10.530255634, 15.495603127))
            Line((10.530255634, 15.495603127), (12.553642104, 23.672897371))
            ThreePointArc((12.553642104, 23.672897371), (9.643979794, 21.347832311), (5.922901386, 21.187714345))
            ThreePointArc((5.922901386, 21.187714345), (2.871576229, 21.81178695), (-0.23729942, 21.998720167))
            ThreePointArc((-0.23729942, 21.998720167), (-3.790143578, 23.116468206), (-5.99889043, 26.115384615))
            Line((-5.99889043, 26.115384615), (-6.16088867, 17.693033963))
            ThreePointArc((-6.16088867, 17.693033963), (-6.808185487, 15.327070116), (-8.502829736, 13.553666902))
            ThreePointArc((-8.502829736, 13.553666902), (-9.740182864, 12.693653445), (-10.891142629, 11.721049963))
            ThreePointArc((-10.891142629, 11.721049963), (-13.0427248, 10.543139844), (-15.495603127, 10.530255634))
            Line((-15.495603127, 10.530255634), (-23.672897371, 12.553642104))
            ThreePointArc((-23.672897371, 12.553642104), (-21.347832311, 9.643979794), (-21.187714345, 5.922901386))
            ThreePointArc((-21.187714345, 5.922901386), (-21.81178695, 2.871576229), (-21.998720167, -0.23729942))
            ThreePointArc((-21.998720167, -0.23729942), (-23.116468206, -3.790143578), (-26.115384615, -5.99889043))
            Line((-26.115384615, -5.99889043), (-17.693033963, -6.16088867))
            ThreePointArc((-17.693033963, -6.16088867), (-15.327070116, -6.808185487), (-13.553666902, -8.502829736))
            ThreePointArc((-13.553666902, -8.502829736), (-12.693653445, -9.740182864), (-11.721049963, -10.891142629))
            ThreePointArc((-11.721049963, -10.891142629), (-10.543139844, -13.0427248), (-10.530255634, -15.495603127))
            Line((-10.530255634, -15.495603127), (-12.553642104, -23.672897371))
            ThreePointArc((-12.553642104, -23.672897371), (-11.933842596, -22.88223021), (-11.190806701, -22.206061852))
            Line((-11.190806701, -22.206061852), (-2.868374529, -15.820035041))
            ThreePointArc((-2.868374529, -15.820035041), (-2.334891739, -15.026585792), (-1.430403111, -14.716640764))
            Line((-1.430403111, -14.716640764), (-1.35603548, -14.659576473))
            Line((-1.35603548, -14.659576473), (-7.933533403, -6.08761429))
            ThreePointArc((-7.933533403, -6.08761429), (-6.08761429, 7.933533403), (7.933533403, 6.08761429))
        make_face()
    extrude(amount=BOSS_EXTRUDE12_DEPTH)



with BuildPart() as body_2:
    # Sketch27 → Revolve1 (revolve)
    with BuildSketch(Plane(origin=(0, -2, 0), x_dir=(1, 0, 0), z_dir=(0, 1, 0))):
        Polygon((4.261330003, 5.553473382), (3.043807145, 3.966766701), (9.390633867, -0.903324731), (10.608156725, 0.68338195), align=None)
    revolve(axis=Axis((4.261330003, -2, -5.553473382), (0.6087614290087197, 0, -0.793353340291236)), revolution_arc=REVOLVE1_ANGLE)


with BuildPart() as part_1:
    add(part.part)

    add(body_2.part)  # Boss-Extrude13 merges body 2
    # Sketch29 → Boss-Extrude13 (add)
    with BuildSketch(Plane(origin=(0, -2, 0), x_dir=(1, 0, 0), z_dir=(0, 1, 0))):
        Polygon((10.608156725, 0.68338195), (-2.085496719, 10.423564814), (-3.303019577, 8.836858134), (9.390633867, -0.903324731), align=None)
    extrude(amount=BOSS_EXTRUDE13_DEPTH)

    # Sketch30 → Cut-Extrude17 (cut)
    with BuildSketch(Plane(origin=(0, 10, 0), x_dir=(1, 0, 0), z_dir=(0, 1, 0))):
        with Locations(Location((-1.421749595, 16.216615803, 0), (0, 0, 270))):
            Circle(SKETCH30_R)
        with Locations(Location((16.032023891, 2.823864364, 0), (0, 0, 270))):
            Circle(SKETCH30_R)
    extrude(amount=-CUT_EXTRUDE17_DEPTH, mode=Mode.SUBTRACT)


solid = part_1.part
